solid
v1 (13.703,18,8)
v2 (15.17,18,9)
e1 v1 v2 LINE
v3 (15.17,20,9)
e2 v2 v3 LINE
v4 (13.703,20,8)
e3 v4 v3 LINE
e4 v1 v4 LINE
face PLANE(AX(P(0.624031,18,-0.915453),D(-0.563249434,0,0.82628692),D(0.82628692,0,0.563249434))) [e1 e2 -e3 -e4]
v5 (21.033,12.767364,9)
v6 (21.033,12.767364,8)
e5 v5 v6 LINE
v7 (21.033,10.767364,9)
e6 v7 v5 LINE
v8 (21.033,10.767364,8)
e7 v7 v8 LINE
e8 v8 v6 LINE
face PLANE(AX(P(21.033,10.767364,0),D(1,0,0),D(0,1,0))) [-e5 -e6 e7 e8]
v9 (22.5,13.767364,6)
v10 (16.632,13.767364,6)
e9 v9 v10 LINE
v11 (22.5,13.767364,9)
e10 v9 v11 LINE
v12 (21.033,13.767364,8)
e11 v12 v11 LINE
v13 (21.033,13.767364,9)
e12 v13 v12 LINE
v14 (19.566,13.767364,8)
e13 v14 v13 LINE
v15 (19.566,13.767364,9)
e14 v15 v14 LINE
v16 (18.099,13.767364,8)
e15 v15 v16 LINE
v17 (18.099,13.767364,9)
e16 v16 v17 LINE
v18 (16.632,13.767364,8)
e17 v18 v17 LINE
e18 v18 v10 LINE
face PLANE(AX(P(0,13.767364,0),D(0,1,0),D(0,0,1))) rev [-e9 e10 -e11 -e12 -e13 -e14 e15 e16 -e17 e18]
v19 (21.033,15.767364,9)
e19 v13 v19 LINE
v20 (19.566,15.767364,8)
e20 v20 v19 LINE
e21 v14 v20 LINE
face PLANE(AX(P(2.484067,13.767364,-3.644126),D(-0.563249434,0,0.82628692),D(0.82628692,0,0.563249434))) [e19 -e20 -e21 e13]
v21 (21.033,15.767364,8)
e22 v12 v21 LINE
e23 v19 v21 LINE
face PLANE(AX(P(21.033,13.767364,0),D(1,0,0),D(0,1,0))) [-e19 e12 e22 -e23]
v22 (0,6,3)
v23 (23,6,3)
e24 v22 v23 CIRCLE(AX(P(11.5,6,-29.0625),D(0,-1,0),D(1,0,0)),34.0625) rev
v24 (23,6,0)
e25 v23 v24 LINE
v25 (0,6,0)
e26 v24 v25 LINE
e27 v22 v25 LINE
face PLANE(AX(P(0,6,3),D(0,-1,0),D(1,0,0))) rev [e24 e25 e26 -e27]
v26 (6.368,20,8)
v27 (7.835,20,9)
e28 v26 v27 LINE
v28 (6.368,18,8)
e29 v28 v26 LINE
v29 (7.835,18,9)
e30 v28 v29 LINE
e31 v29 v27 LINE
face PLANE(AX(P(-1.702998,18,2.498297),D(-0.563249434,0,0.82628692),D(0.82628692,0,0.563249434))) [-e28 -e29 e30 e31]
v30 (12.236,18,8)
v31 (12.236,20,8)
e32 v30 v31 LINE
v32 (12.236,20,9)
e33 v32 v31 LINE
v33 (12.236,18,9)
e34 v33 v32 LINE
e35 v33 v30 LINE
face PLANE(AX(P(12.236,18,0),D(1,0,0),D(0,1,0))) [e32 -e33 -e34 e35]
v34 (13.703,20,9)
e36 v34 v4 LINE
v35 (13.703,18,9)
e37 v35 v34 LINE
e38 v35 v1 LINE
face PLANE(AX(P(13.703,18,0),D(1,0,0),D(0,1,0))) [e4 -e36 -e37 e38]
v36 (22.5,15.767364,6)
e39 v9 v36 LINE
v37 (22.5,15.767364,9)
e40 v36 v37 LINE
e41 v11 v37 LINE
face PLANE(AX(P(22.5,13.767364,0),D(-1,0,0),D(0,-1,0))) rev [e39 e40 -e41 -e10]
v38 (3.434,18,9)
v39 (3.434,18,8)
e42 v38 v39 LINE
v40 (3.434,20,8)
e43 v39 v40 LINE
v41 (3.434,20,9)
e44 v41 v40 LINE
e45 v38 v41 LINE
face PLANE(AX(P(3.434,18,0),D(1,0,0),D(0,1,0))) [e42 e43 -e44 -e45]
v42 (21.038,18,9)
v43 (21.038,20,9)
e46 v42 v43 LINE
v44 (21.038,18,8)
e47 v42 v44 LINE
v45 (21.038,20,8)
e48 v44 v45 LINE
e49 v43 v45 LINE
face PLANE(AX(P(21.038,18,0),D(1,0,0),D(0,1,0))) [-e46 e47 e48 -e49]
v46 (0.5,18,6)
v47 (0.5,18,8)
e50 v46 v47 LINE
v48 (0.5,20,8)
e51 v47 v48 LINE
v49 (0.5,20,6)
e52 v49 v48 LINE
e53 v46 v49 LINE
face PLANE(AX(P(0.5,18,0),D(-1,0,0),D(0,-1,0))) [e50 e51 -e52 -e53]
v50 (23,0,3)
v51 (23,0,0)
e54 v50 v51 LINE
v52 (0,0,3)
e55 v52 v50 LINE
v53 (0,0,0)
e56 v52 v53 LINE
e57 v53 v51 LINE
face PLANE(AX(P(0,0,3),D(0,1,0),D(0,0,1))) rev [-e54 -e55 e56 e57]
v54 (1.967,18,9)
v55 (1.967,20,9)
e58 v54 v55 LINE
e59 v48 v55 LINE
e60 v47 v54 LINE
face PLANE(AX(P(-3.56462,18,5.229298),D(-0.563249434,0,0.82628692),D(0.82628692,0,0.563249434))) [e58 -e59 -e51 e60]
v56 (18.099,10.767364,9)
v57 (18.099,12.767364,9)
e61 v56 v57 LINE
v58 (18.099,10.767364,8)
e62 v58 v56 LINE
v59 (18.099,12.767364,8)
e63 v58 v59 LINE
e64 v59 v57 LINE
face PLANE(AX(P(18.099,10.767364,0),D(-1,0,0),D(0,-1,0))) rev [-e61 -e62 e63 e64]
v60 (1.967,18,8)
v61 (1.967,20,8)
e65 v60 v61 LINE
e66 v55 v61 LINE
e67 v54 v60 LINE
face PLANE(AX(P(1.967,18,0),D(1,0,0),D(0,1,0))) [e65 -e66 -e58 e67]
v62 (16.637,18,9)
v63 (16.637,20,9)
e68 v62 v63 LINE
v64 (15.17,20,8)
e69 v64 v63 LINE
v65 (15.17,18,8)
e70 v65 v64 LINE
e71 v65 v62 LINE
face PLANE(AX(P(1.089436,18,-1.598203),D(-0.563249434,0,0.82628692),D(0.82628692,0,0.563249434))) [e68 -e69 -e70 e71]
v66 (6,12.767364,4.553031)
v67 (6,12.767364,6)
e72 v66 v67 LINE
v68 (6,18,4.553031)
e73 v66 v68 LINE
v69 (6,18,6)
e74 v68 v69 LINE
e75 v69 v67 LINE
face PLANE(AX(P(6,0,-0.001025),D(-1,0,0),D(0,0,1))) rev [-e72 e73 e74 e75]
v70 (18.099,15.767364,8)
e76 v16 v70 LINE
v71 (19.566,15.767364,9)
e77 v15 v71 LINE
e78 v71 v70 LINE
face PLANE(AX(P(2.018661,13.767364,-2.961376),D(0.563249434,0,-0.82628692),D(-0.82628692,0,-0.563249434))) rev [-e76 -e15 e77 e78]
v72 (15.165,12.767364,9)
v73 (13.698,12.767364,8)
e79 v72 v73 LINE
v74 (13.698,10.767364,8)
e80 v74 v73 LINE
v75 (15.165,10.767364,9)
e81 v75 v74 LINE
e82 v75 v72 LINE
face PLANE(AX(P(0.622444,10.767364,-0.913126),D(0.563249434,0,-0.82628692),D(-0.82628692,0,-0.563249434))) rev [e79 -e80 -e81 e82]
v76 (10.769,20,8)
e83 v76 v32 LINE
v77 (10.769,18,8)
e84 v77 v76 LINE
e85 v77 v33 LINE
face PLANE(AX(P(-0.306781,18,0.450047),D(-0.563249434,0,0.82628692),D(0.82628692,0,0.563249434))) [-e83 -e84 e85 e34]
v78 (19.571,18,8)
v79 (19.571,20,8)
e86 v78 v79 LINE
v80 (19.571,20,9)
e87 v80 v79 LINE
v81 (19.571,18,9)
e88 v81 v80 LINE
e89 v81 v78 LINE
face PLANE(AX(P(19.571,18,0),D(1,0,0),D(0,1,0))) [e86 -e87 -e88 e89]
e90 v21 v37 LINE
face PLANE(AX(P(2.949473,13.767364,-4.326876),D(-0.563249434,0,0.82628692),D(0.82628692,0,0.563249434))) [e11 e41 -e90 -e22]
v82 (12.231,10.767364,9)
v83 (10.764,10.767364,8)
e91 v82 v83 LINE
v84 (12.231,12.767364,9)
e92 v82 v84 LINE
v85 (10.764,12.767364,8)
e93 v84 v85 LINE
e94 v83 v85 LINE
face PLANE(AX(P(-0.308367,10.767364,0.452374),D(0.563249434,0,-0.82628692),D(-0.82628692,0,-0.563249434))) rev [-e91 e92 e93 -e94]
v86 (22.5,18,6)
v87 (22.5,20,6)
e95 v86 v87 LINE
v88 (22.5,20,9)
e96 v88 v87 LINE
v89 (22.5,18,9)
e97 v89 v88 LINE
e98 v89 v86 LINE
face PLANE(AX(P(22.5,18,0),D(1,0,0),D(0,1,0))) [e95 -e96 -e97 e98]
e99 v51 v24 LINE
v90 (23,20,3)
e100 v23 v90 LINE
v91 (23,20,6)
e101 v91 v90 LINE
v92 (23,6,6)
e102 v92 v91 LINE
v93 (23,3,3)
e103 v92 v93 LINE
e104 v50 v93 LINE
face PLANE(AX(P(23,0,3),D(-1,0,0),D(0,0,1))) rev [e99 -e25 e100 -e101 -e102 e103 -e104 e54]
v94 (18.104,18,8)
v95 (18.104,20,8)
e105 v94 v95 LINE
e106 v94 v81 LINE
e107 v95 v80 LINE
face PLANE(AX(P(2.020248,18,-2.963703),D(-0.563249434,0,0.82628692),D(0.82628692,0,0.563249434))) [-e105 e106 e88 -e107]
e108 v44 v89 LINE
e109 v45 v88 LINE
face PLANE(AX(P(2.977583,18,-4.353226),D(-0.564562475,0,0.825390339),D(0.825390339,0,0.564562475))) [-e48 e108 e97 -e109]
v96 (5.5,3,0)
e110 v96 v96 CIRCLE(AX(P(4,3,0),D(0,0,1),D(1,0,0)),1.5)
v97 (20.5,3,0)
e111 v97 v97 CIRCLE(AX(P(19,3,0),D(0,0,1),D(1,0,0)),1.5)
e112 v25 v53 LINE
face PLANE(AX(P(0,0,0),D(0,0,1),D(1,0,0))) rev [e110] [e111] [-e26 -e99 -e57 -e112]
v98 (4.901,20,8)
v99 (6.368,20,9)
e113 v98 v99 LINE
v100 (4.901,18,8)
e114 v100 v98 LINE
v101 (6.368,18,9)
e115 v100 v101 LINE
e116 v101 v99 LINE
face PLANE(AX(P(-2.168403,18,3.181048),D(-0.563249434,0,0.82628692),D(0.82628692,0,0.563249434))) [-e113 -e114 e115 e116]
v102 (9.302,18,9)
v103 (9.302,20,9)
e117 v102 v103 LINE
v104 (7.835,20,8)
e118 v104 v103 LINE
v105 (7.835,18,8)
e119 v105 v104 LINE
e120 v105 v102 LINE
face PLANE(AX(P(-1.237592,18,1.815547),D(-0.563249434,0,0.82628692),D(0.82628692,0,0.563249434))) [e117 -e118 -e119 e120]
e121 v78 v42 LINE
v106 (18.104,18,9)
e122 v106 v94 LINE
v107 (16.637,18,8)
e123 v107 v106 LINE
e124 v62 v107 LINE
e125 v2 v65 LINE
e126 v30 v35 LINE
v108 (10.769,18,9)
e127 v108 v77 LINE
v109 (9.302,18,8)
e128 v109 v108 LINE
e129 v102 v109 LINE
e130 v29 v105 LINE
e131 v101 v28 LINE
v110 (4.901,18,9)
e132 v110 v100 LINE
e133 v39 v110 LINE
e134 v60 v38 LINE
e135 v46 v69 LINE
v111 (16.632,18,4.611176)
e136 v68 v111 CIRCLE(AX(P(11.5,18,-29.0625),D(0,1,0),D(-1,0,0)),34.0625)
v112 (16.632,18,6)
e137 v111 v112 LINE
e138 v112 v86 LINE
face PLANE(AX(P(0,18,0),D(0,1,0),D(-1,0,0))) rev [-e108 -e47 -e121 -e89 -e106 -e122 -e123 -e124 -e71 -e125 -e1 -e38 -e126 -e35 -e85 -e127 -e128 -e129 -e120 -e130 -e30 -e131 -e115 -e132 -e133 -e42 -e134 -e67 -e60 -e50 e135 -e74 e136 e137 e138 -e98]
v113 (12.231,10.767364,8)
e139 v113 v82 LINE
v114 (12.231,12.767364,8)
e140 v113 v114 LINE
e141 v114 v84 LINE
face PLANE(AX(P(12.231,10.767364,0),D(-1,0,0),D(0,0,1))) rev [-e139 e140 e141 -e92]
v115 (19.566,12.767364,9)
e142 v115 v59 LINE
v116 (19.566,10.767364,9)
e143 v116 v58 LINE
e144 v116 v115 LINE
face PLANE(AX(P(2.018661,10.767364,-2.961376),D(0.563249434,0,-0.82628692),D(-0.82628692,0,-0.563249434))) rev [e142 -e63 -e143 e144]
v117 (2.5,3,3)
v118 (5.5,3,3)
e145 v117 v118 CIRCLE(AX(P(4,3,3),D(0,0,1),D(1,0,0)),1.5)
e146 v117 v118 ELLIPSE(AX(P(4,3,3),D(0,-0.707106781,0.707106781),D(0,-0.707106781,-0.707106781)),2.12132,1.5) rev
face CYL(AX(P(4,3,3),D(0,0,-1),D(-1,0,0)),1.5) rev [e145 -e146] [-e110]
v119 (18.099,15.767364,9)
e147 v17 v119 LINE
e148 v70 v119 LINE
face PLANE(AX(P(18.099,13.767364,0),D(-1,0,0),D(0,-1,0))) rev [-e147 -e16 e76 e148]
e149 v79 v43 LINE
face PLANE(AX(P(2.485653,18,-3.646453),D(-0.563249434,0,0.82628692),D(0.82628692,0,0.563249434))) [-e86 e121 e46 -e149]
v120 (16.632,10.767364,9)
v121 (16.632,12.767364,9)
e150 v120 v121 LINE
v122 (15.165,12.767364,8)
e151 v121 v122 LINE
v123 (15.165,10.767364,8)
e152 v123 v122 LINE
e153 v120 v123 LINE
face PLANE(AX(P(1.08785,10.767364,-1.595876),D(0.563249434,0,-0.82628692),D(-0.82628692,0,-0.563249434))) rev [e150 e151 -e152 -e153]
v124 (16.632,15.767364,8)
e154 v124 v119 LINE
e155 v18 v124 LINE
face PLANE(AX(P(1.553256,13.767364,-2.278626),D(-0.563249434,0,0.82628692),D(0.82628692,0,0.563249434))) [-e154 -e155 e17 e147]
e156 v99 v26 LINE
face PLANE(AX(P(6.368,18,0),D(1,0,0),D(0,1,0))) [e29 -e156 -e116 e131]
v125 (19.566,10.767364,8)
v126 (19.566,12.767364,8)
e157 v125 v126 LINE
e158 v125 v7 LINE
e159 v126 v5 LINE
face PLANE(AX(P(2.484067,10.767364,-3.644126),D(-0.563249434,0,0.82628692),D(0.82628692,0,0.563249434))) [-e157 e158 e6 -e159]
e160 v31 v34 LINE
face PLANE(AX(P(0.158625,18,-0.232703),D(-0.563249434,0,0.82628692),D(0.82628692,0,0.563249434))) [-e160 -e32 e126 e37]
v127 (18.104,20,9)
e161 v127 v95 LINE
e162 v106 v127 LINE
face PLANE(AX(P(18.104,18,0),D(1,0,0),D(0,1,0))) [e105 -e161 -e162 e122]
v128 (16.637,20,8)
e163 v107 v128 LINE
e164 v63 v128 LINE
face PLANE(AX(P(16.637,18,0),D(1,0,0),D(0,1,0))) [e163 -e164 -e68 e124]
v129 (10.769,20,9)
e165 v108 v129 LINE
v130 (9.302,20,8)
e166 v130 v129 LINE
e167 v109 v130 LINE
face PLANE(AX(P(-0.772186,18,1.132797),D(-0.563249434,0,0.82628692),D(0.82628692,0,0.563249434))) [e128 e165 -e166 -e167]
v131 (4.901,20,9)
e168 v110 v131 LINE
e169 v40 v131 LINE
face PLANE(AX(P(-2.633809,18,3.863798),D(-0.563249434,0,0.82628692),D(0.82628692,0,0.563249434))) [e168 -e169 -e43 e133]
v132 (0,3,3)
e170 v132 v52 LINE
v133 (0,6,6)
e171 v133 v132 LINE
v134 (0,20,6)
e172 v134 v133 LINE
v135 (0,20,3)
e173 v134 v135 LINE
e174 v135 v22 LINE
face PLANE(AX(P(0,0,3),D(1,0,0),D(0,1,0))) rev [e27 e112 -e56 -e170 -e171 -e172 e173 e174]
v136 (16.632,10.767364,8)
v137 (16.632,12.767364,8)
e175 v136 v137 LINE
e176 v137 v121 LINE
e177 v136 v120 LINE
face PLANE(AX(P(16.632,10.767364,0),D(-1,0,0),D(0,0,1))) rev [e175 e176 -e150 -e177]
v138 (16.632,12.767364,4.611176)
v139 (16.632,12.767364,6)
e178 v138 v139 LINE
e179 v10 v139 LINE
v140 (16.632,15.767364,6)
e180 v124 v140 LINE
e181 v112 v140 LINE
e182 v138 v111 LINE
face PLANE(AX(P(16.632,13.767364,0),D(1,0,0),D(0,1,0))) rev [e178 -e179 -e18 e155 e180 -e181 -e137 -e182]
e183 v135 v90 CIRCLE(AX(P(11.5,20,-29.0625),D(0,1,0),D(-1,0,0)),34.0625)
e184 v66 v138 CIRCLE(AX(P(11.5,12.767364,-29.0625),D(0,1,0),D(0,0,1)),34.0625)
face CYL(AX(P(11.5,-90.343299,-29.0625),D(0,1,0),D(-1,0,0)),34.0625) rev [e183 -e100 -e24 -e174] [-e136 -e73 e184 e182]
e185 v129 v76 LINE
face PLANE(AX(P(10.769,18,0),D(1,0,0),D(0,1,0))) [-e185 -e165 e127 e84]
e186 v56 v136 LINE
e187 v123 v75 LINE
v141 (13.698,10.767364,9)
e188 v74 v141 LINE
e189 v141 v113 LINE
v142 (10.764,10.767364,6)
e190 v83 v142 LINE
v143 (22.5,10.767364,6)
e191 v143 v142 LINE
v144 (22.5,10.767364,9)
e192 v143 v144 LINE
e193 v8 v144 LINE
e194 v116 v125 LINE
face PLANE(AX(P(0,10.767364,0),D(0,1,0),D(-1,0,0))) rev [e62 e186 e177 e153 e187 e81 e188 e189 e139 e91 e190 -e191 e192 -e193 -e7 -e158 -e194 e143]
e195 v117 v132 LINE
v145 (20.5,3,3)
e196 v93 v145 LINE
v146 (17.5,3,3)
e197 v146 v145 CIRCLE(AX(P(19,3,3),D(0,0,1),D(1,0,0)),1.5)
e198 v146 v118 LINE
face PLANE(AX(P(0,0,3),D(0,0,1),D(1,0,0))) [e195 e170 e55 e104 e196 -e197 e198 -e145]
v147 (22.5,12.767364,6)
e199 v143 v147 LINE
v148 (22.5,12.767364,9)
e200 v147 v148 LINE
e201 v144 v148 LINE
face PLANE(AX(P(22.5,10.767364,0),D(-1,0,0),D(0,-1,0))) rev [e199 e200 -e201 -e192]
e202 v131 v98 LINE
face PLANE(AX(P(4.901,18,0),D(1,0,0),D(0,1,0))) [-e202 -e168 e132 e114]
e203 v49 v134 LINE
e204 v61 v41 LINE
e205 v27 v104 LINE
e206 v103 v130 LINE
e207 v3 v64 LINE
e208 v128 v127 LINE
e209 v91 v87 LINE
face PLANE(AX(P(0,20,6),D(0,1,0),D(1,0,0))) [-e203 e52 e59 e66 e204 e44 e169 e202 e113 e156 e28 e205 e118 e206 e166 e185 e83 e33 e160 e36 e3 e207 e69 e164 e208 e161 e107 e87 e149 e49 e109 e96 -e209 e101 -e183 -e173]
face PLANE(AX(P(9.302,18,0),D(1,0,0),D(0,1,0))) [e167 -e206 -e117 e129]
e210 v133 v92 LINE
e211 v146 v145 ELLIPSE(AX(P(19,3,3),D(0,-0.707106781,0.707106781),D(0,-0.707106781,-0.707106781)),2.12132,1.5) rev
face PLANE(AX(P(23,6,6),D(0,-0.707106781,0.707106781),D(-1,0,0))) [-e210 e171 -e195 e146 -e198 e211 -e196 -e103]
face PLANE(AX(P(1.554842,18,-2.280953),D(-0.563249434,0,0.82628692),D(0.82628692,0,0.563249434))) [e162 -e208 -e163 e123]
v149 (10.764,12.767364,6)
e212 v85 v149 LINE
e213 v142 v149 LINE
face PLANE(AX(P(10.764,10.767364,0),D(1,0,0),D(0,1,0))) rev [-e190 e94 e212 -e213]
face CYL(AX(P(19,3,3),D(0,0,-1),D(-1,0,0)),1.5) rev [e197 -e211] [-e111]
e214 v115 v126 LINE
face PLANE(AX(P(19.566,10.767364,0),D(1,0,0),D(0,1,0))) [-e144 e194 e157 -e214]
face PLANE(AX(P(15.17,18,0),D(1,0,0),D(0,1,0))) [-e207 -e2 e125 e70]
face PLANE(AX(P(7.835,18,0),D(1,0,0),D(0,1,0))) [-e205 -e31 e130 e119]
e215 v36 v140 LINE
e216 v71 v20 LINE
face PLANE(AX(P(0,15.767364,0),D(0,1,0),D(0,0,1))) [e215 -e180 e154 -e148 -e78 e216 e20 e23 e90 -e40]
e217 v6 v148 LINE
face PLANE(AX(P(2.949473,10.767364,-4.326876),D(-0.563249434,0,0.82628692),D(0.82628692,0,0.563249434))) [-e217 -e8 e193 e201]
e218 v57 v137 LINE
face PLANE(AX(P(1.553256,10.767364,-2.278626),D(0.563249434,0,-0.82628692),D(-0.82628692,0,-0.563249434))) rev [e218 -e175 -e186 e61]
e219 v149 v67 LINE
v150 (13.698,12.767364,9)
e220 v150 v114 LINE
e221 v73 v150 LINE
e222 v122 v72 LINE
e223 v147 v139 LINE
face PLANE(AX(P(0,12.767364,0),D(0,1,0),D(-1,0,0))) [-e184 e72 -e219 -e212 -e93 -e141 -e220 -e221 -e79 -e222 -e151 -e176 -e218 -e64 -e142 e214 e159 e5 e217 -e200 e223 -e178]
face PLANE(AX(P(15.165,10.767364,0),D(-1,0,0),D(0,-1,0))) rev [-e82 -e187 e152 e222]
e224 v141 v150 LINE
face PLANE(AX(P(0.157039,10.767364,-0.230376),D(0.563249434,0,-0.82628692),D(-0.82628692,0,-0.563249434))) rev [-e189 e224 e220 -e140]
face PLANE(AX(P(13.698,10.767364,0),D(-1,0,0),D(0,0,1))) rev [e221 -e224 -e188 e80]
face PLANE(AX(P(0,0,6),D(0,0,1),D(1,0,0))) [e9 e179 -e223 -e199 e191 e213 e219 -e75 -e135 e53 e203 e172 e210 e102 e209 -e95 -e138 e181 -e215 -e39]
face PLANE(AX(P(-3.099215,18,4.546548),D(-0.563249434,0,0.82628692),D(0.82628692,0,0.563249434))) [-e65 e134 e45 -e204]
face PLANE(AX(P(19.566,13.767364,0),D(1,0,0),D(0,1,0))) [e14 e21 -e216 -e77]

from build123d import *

# Parameters (mm, degrees)
CROQUIS1_W                 = 23
CROQUIS1_H                 = 6
CROQUIS1_R                 = 1.5
SALIENTE_EXTRUIR1_DEPTH    = 3
RECUBRIR1_DEPTH            = 23
CROQUIS2_R                 = 1.5
CORTAR_EXTRUIR1_DEPTH      = 3
CROQUIS3_R                 = 34.0625
CORTAR_EXTRUIR2_DEPTH      = 14
SALIENTE_EXTRUIR2_DEPTH    = 2
SALIENTE_EXTRUIR3_DEPTH    = 2
CROQUIS8_W                 = 11.736
CROQUIS8_H                 = 2
SALIENTE_EXTRUIR4_DEPTH    = 2
CORTAR_EXTRUIR3_REACH      = 33.064
CORTAR_EXTRUIR3_END_RADIUS = 34.0625


# Read off the part's stored shape, not the designer's step: Recubrir1
with BuildPart() as part:
    # Croquis1 → Saliente-Extruir1 (new body)
    with BuildSketch(Plane.XY):
        with Locations((11.5, 3)):
            Rectangle(CROQUIS1_W, CROQUIS1_H)
        with Locations((4, 3)):
            Circle(CROQUIS1_R, mode=Mode.SUBTRACT)
        with Locations((19, 3)):
            Circle(CROQUIS1_R, mode=Mode.SUBTRACT)
    extrude(amount=SALIENTE_EXTRUIR1_DEPTH)

    # Recubrir1 outline → Recubrir1 (add)
    with BuildSketch(Plane.YZ):
        Polygon((3, 3), (20, 3), (20, 6), (6, 6), align=None)
    extrude(amount=RECUBRIR1_DEPTH)

    # Croquis2 → Cortar-Extruir1 (cut)
    with BuildSketch(Plane.XY.offset(3)):
        with Locations((4, 3)):
            Circle(CROQUIS2_R)
        with Locations((19, 3)):
            Circle(CROQUIS2_R)
    extrude(amount=CORTAR_EXTRUIR1_DEPTH, mode=Mode.SUBTRACT)

    # Croquis3 → Cortar-Extruir2 (cut)
    with BuildSketch(Plane(origin=(0, 20, 0), x_dir=(1, 0, 0), z_dir=(0, 1, 0))):
        with Locations((11.5, 29.0625)):
            Circle(CROQUIS3_R)
    extrude(amount=-CORTAR_EXTRUIR2_DEPTH, mode=Mode.SUBTRACT)

    # Croquis6 → Saliente-Extruir2 (add)
    with BuildSketch(Plane(origin=(0, 20, 0), x_dir=(1, 0, 0), z_dir=(0, 1, 0))):
        Polygon((22.5, -6), (0.5, -6), (0.5, -8), (1.967, -9), (1.967, -8), (3.434, -9), (3.434, -8), (4.901, -9), (4.901, -8), (6.368, -9), (6.368, -8), (7.835, -9), (7.835, -8), (9.302, -9), (9.302, -8), (10.769, -9), (10.769, -8), (12.236, -9), (12.236, -8), (13.703, -9), (13.703, -8), (15.17, -9), (15.17, -8), (16.637, -9), (16.637, -8), (18.104, -9), (18.104, -8), (19.571, -9), (19.571, -8), (21.038, -9), (21.038, -8), (22.5, -9), align=None)
    extrude(amount=-SALIENTE_EXTRUIR2_DEPTH)

    # Croquis7 → Saliente-Extruir3 (add)
    with BuildSketch(Plane(origin=(0, 15.767364365, 0), x_dir=(1, 0, 0), z_dir=(0, 1, 0))):
        Polygon((18.099, -9), (18.099, -8), (19.566, -9), (19.566, -8), (21.033, -9), (21.033, -8), (22.5, -9), (22.5, -6), (16.632, -6), (16.632, -8), align=None)
    extrude(amount=-SALIENTE_EXTRUIR3_DEPTH)

    # Croquis8 → Saliente-Extruir4 (add)
    with BuildSketch(Plane(origin=(0, 12.767364365, 0), x_dir=(1, 0, 0), z_dir=(0, 1, 0))):
        with Locations((16.632, -7)):
            Rectangle(CROQUIS8_W, CROQUIS8_H)
        Polygon((15.165, -8), (13.698, -8), (15.165, -9), align=None)
        Polygon((13.698, -8), (12.231, -8), (13.698, -9), align=None)
        Polygon((12.231, -8), (10.764, -8), (12.231, -9), align=None)
        Polygon((16.632, -9), (16.632, -8), (15.165, -8), align=None)
        Polygon((18.099, -9), (18.099, -8), (16.632, -8), align=None)
        Polygon((19.566, -9), (19.566, -8), (18.099, -8), align=None)
        Polygon((21.033, -9), (21.033, -8), (19.566, -8), align=None)
        Polygon((22.5, -9), (22.5, -8), (21.033, -8), align=None)
    extrude(amount=-SALIENTE_EXTRUIR4_DEPTH)

    # Cortar-Extruir3: up to this cylinder (the profile starts outside it)
    cortar_extruir3_end = Plane(origin=(11.5, 15.383682, -29.0625), z_dir=(0, 1, 0)) * Cylinder(CORTAR_EXTRUIR3_END_RADIUS, 135.253, mode=Mode.PRIVATE)
    # Croquis9 → Cortar-Extruir3 (cut, up to the surface)
    with BuildSketch(Plane.XY.offset(6), mode=Mode.PRIVATE) as cortar_extruir3_sk1:
        Polygon((10.764, 12.767364365), (16.632, 12.767364365), (16.632, 13.767364365), (16.632, 15.767364365), (16.632, 18), (6, 18), (6, 12.767364365), align=None)
    cortar_extruir3_tool1 = extrude(cortar_extruir3_sk1.sketch, amount=-CORTAR_EXTRUIR3_REACH, mode=Mode.PRIVATE) - cortar_extruir3_end
    add(cortar_extruir3_tool1.solids().sort_by_distance((11.316, 15.383682, 6))[0], mode=Mode.SUBTRACT)


solid = part.part
